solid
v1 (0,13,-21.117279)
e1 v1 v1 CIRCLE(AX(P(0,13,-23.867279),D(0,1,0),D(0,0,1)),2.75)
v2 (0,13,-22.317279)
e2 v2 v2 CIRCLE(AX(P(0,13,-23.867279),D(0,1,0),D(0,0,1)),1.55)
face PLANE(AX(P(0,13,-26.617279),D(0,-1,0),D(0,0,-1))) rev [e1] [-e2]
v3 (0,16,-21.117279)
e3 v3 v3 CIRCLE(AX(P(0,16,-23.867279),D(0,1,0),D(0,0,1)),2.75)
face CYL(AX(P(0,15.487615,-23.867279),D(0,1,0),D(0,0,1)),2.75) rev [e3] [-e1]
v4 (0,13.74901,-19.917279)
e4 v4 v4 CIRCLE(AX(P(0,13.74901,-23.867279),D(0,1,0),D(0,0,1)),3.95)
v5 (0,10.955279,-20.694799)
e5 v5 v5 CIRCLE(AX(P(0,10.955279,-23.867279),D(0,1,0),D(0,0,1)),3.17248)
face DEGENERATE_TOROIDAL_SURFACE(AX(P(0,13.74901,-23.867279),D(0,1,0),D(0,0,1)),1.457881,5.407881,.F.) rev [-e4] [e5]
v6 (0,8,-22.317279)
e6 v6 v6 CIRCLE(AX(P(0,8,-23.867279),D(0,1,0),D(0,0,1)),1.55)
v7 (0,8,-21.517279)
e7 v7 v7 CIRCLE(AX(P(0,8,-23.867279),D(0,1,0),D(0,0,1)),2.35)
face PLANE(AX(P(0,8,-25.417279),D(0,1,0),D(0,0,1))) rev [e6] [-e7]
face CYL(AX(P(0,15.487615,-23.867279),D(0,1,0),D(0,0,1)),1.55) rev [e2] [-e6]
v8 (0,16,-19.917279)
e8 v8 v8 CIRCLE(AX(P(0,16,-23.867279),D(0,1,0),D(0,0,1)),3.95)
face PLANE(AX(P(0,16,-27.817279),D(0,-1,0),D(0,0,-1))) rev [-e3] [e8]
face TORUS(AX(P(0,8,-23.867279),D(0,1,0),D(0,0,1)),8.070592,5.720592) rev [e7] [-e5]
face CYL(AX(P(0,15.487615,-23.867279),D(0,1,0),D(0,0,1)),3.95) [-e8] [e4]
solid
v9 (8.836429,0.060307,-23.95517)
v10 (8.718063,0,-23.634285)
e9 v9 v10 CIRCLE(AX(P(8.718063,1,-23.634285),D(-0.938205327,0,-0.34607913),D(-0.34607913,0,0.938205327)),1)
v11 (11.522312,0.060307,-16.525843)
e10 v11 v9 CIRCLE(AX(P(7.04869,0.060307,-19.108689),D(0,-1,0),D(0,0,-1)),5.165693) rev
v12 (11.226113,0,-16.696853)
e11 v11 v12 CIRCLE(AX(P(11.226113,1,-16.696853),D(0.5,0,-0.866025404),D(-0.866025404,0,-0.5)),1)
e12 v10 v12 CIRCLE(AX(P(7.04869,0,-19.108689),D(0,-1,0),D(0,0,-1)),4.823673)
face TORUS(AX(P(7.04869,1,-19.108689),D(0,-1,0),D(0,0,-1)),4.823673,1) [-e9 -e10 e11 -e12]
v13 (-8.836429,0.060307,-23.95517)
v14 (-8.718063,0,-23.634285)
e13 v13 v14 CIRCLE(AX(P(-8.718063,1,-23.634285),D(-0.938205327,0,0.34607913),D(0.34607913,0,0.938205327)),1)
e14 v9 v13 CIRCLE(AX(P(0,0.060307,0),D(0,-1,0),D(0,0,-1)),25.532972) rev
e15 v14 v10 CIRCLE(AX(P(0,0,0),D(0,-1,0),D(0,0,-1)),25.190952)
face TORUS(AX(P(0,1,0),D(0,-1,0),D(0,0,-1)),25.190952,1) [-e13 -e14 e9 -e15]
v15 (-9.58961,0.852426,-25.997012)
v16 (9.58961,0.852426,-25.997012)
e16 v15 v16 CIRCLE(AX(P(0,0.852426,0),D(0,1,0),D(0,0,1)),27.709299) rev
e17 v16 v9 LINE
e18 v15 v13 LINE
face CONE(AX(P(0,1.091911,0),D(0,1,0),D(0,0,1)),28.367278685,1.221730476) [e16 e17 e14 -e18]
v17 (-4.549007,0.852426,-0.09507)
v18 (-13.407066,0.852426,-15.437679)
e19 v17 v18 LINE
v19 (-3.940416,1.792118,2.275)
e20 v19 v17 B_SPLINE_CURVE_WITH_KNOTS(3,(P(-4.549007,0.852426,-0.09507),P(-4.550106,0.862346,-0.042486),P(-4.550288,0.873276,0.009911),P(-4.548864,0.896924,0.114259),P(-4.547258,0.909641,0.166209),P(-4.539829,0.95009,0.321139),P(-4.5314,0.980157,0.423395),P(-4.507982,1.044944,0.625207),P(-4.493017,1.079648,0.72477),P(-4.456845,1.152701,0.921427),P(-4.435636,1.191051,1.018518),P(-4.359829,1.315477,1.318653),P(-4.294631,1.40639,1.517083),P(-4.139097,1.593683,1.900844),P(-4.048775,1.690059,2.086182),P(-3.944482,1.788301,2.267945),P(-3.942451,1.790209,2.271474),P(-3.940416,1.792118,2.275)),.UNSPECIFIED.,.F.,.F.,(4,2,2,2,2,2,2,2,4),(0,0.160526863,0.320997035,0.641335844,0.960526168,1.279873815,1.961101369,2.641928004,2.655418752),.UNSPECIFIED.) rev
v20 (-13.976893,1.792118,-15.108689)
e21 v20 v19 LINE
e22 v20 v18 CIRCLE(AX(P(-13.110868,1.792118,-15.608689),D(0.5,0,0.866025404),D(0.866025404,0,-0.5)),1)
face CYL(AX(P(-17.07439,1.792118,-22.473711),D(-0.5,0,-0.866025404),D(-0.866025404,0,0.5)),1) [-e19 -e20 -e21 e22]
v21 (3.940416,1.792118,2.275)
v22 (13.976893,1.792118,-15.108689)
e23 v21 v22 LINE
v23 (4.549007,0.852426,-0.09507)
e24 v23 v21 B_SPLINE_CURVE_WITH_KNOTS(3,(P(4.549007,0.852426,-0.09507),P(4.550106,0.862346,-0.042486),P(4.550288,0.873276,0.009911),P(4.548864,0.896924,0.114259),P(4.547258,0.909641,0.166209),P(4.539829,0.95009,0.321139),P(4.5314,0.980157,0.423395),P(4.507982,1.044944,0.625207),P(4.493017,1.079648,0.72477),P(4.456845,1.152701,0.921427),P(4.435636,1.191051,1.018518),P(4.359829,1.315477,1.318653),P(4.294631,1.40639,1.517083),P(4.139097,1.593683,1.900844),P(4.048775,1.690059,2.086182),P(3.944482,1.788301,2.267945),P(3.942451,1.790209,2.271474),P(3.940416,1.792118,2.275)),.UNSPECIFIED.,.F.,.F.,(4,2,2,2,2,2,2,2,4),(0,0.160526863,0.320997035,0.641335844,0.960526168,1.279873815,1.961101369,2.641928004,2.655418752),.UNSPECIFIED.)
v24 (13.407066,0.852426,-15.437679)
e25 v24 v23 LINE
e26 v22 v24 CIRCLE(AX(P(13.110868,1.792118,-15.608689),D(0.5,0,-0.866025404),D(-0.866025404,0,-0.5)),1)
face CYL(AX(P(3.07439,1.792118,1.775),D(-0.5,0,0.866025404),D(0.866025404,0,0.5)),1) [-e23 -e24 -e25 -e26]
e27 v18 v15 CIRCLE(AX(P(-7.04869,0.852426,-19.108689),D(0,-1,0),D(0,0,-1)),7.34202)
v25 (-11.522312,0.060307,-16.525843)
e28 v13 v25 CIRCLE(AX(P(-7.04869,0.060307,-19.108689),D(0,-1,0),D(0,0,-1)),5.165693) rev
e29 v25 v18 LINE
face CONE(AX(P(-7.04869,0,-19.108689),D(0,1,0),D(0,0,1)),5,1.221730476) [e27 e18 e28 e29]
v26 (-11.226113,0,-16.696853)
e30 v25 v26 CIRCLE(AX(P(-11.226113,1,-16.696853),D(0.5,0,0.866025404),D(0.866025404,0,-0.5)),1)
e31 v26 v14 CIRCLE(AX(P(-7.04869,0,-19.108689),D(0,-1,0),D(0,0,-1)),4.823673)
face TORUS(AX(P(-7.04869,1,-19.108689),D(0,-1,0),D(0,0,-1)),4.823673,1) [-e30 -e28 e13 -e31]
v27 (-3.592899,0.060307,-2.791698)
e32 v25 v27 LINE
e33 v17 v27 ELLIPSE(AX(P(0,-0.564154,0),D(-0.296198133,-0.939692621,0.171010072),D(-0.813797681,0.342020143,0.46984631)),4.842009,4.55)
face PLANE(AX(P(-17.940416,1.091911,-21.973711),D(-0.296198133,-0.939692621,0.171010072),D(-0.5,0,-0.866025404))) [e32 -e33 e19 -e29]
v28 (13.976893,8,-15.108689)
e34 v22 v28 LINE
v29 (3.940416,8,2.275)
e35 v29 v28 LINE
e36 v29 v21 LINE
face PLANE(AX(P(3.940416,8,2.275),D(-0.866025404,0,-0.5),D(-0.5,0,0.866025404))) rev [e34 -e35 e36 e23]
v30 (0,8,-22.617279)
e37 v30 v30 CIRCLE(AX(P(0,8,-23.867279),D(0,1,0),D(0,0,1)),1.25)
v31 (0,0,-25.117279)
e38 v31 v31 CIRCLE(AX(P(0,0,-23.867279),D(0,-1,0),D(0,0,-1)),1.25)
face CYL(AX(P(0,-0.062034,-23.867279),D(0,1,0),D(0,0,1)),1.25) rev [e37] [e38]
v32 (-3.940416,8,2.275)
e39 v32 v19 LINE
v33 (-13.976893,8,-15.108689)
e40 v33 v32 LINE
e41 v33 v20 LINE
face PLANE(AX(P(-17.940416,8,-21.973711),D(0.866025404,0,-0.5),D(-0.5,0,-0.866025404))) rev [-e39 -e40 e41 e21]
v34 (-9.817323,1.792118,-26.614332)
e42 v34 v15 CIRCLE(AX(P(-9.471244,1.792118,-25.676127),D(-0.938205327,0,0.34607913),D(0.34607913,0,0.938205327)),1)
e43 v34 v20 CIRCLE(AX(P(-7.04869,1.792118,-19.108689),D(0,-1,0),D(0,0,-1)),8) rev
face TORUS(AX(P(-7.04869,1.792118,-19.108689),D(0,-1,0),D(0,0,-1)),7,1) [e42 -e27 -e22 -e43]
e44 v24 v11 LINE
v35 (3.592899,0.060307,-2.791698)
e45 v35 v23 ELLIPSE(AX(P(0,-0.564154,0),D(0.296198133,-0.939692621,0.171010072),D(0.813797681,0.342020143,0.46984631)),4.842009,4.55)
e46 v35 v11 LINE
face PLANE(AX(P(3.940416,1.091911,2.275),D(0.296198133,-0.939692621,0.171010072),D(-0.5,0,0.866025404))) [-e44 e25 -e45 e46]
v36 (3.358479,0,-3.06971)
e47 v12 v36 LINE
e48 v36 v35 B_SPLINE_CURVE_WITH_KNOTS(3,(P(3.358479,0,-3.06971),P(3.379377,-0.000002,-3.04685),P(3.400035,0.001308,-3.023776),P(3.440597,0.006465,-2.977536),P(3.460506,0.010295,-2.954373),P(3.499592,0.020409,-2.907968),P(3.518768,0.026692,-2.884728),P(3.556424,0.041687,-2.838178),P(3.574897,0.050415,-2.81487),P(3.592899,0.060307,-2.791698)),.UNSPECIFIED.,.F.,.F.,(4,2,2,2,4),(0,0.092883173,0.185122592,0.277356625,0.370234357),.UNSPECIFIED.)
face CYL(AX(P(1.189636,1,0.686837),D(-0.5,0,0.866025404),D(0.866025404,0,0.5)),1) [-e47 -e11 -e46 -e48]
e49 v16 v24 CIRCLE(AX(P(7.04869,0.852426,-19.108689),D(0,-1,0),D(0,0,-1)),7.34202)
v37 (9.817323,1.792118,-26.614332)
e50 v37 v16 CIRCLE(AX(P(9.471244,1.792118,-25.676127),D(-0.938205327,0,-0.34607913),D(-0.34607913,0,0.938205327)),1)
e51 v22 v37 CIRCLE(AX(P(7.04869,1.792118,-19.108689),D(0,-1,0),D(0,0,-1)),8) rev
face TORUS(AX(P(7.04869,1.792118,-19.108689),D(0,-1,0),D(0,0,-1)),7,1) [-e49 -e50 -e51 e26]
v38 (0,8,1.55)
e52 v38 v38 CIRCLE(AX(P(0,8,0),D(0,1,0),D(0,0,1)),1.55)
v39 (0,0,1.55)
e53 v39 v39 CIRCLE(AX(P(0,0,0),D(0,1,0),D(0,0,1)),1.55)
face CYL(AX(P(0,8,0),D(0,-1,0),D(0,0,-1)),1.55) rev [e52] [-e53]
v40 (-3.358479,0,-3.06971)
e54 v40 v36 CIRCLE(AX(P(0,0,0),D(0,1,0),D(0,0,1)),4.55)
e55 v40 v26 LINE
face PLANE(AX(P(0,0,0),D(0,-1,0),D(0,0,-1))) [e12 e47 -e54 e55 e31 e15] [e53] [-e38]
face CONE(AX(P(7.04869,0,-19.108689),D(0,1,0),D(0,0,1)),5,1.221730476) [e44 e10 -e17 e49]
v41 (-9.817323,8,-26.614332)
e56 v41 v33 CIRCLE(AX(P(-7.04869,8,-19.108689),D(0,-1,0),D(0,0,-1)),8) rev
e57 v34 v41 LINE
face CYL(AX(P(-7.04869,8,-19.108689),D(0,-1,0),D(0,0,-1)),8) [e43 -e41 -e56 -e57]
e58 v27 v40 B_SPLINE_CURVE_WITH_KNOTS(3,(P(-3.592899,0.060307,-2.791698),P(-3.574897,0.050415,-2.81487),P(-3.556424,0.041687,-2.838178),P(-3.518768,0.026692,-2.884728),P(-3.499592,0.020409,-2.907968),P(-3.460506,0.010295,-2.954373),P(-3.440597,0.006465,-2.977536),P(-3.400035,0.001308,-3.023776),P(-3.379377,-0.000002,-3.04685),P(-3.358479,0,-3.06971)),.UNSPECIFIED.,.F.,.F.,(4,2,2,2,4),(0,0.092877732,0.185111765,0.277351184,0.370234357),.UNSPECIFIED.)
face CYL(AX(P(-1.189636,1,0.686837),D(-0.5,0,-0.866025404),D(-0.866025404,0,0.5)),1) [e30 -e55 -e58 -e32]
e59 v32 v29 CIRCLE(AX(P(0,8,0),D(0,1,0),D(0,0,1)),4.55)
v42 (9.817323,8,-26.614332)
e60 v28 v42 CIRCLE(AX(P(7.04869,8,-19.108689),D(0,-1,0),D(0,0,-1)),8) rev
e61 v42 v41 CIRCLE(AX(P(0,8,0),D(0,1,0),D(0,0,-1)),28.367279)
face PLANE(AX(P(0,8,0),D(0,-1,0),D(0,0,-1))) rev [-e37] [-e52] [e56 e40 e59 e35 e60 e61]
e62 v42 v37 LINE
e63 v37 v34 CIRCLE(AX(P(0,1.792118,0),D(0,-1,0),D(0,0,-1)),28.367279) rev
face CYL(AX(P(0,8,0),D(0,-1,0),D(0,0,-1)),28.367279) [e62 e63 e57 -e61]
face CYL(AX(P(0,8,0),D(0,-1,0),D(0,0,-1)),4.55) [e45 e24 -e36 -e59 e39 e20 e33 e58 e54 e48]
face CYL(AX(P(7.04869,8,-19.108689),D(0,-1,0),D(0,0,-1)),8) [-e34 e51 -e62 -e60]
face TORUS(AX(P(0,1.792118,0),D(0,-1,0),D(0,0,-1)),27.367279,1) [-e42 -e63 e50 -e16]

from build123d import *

# Parameters (mm, degrees)
SKETCH1_R           = 1.55
BOSS_EXTRUDE1_DEPTH = 8
FILLET1_R           = 8
CHAMFER1_SIZE       = 1.091910703
CHAMFER1_SIZE_2     = 3
BOSS_EXTRUDE2_START = -8
SKETCH2_R           = 4.55
SKETCH2_R_2         = 1.55
BOSS_EXTRUDE2_DEPTH = 8
FILLET2_R           = 1
SKETCH3_R           = 1.25
CUT_EXTRUDE1_DEPTH  = 34.093285996


with BuildPart() as part:
    # Sketch1 → Boss-Extrude1 (new body)
    with BuildSketch(Plane(origin=(0, 0, 0), x_dir=(1, 0, 0), z_dir=(0, 1, 0))):
        with BuildLine():
            Line((-17.940415587, 21.973711306), (-3.940415587, -2.275))
            ThreePointArc((-3.940415587, -2.275), (0, -4.55), (3.940415587, -2.275))
            Line((3.940415587, -2.275), (17.940415587, 21.973711306))
            ThreePointArc((17.940415587, 21.973711306), (0, 28.367278685), (-17.940415587, 21.973711306))
        make_face()
        with Locations(Location((0, 0, 0), (0, 0, 270))):
            Circle(SKETCH1_R, mode=Mode.SUBTRACT)
    extrude(amount=BOSS_EXTRUDE1_DEPTH)

    # Fillet1
    fillet1_edges = [part.edges().sort_by_distance(p)[0] for p in [
        (17.940415587, 4, -21.973711306),
        (-17.940415587, 4, -21.973711306),
    ]]
    fillet(fillet1_edges, radius=FILLET1_R)

    # Chamfer1
    # the kernel refuses this chamfer: 3, 1.091910703 mm, written as the material it takes off along each edge
    with BuildSketch(Plane(origin=(-13.976893319, 0, -15.10868936), x_dir=(-0.08577193736400629, 0.9950833631817486, 0.04952045112602449), z_dir=(0.49999999999999806, 0, 0.8660254037844399))) as chamfer1_piece_1:
        Polygon((CHAMFER1_SIZE * 0.995083362998, -CHAMFER1_SIZE * 0.0990409022338), (-CHAMFER1_SIZE_2 * 0.099040902252, -CHAMFER1_SIZE_2 * 0.995083363182), (0, 0), align=None)
    extrude(amount=20.072955463, mode=Mode.SUBTRACT)
    with BuildSketch(Plane(origin=(0, 0, 0), x_dir=(0.3460791300418841, 0, -0.9382053270736915), z_dir=(0.9382053270736915, 0, 0.3460791300418841))) as chamfer1_piece_2:
        Polygon((28.367278685 - CHAMFER1_SIZE_2, 0), (28.367278685, CHAMFER1_SIZE), (28.367278685, 0), align=None)
    revolve(axis=Axis((0, 0, 0), (0, 1, 0)), revolution_arc=40.495367591, mode=Mode.SUBTRACT)
    with BuildSketch(Plane(origin=(7.048690089, 0, -19.10868936), x_dir=(0.86602540378444, 0, 0.4999999999999976), z_dir=(-0.4999999999999976, 0, 0.86602540378444))) as chamfer1_piece_3:
        Polygon((8 - CHAMFER1_SIZE_2, 0), (8, CHAMFER1_SIZE), (8, 0), align=None)
    revolve(axis=Axis((7.048690089, 0, -19.10868936), (0, 1, 0)), revolution_arc=99.752316204, mode=Mode.SUBTRACT)
    with BuildSketch(Plane(origin=(-7.048690089, 0, -19.10868936), x_dir=(-0.8660254037844399, 0, 0.499999999999998), z_dir=(0.499999999999998, 0, 0.8660254037844399))) as chamfer1_piece_4:
        Polygon((8 - CHAMFER1_SIZE_2, 0), (8, -CHAMFER1_SIZE), (8, 0), align=None)
    revolve(axis=Axis((-7.048690089, 0, -19.10868936), (0, -1, 0)), revolution_arc=99.752316204, mode=Mode.SUBTRACT)
    with BuildSketch(Plane(origin=(3.940415587, 0, 2.275), x_dir=(-0.8659501345095242, -0.013184058198645904, -0.4999565432638637), z_dir=(0.49999999999999806, 0, -0.8660254037844399))) as chamfer1_piece_5:
        Polygon((CHAMFER1_SIZE_2 * 0.999913086528, CHAMFER1_SIZE_2 * 0.0131840581986), (-CHAMFER1_SIZE * 0.0131840581962, CHAMFER1_SIZE * 0.999913086343), (0, 0), align=None)
    extrude(amount=20.072955463, mode=Mode.SUBTRACT)
    with BuildSketch(Plane(origin=(0, 0, 0), x_dir=(-0.8660254037844397, 0, 0.49999999999999806), z_dir=(-0.49999999999999806, 0, -0.8660254037844397))) as chamfer1_piece_6:
        Polygon((4.55 - CHAMFER1_SIZE_2, 0), (4.55, CHAMFER1_SIZE), (4.55, 0), align=None)
    revolve(axis=Axis((0, 0, 0), (0, 1, 0)), revolution_arc=120, mode=Mode.SUBTRACT)

    # Sketch2 → Boss-Extrude2 (add)
    with BuildSketch(Plane(origin=(0, 8, 0), x_dir=(1, 0, 0), z_dir=(0, 1, 0)).offset(BOSS_EXTRUDE2_START)):
        Circle(SKETCH2_R)
        with Locations(Location((0, 0, 0), (0, 0, 270))):
            Circle(SKETCH2_R_2, mode=Mode.SUBTRACT)
    extrude(amount=BOSS_EXTRUDE2_DEPTH)

    # Fillet2
    # the kernel refuses this fillet: 1 mm, written as the material it takes off along each edge
    with BuildSketch(Plane(origin=(-11.378817108, 0, -16.60868936), x_dir=(0.866025403784329, -5.361374088471519e-13, -0.50000000000019), z_dir=(0.5000000000001901, 0, 0.866025403784329))) as fillet2_piece_1_section:
        with BuildLine():
            CenterArc((FILLET2_R * 0.176326980708, FILLET2_R), FILLET2_R, 250, 20)
            Line((-FILLET2_R * 0.165693162617, FILLET2_R * 0.0603073792139), (0, 0))
            Line((0, 0), (FILLET2_R * 0.176326980708, 0))
        make_face()
    fillet2_piece_1 = extrude(amount=16.235922988, mode=Mode.PRIVATE)
    fillet2_piece_1 = fillet2_piece_1 - Plane(origin=(0, 0.006623758, 0), x_dir=(-0.8660254037844397, 0, 0.49999999999999806), z_dir=(0, -1, 0)) * Cylinder(4.55, 34, mode=Mode.PRIVATE)
    add(fillet2_piece_1, mode=Mode.SUBTRACT)
    with BuildSketch(Plane(origin=(-7.048690089, 0, -19.10868936), x_dir=(-0.8660254037843291, 0, 0.5000000000001897), z_dir=(0.5000000000001897, 0, 0.8660254037843291))) as fillet2_piece_2:
        with BuildLine():
            CenterArc((5 - FILLET2_R * 0.176326980739, -FILLET2_R), FILLET2_R, 69.999999997, 20.000000003)
            Line((5 + FILLET2_R * 0.165693162642, -FILLET2_R * 0.0603073792344), (5, 0))
            Line((5, 0), (5 - FILLET2_R * 0.176326980739, 0))
        make_face()
    revolve(axis=Axis((-7.048690089, 0, -19.10868936), (0, -1, 0)), revolution_arc=99.752316204, mode=Mode.SUBTRACT)
    with BuildSketch(Plane(origin=(0, 0, 0), x_dir=(0.34607913004188606, 0, -0.938205327073691), z_dir=(0.938205327073691, 0, 0.34607913004188606))) as fillet2_piece_3:
        with BuildLine():
            CenterArc((25.367278685 - FILLET2_R * 0.176326980739, FILLET2_R), FILLET2_R, 270, 20.000000003)
            Line((25.367278685 + FILLET2_R * 0.165693162642, FILLET2_R * 0.0603073792344), (25.367278685, 0))
            Line((25.367278685, 0), (25.367278685 - FILLET2_R * 0.176326980739, 0))
        make_face()
    revolve(axis=Axis((0, 0, 0), (0, 1, 0)), revolution_arc=40.495367591, mode=Mode.SUBTRACT)
    with BuildSketch(Plane(origin=(7.048690089, 0, -19.10868936), x_dir=(0.8660254037843291, 0, 0.5000000000001897), z_dir=(-0.5000000000001897, 0, 0.8660254037843291))) as fillet2_piece_4:
        with BuildLine():
            CenterArc((5 - FILLET2_R * 0.176326980739, FILLET2_R), FILLET2_R, 270, 20.000000003)
            Line((5 + FILLET2_R * 0.165693162642, FILLET2_R * 0.0603073792344), (5, 0))
            Line((5, 0), (5 - FILLET2_R * 0.176326980739, 0))
        make_face()
    revolve(axis=Axis((7.048690089, 0, -19.10868936), (0, 1, 0)), revolution_arc=99.752316204, mode=Mode.SUBTRACT)
    with BuildSketch(Plane(origin=(-13.976893319, 1.091910703, -15.10868936), x_dir=(0.8137976813493196, -0.34202014332551345, -0.469846310393161), z_dir=(0.5000000000001901, 0, 0.866025403784329))) as fillet2_piece_5_section:
        with BuildLine():
            CenterArc((FILLET2_R * 0.70020753821, FILLET2_R), FILLET2_R, 200, 70)
            Line((-FILLET2_R * 0.239485082576, FILLET2_R * 0.657979856674), (0, 0))
            Line((0, 0), (FILLET2_R * 0.70020753821, 0))
        make_face()
    fillet2_piece_5 = extrude(amount=21.823474309, mode=Mode.PRIVATE)
    fillet2_piece_5 = fillet2_piece_5 - Plane(origin=(0, 1.202448518, 0), x_dir=(-0.8660254037844397, 0, 0.49999999999999806), z_dir=(0, -1, 0)) * Cylinder(4.55, 47, mode=Mode.PRIVATE)
    add(fillet2_piece_5, mode=Mode.SUBTRACT)
    with BuildSketch(Plane(origin=(-7.048690089, 1.091910703, -19.10868936), x_dir=(-0.8660254037843289, 0, 0.5000000000001901), z_dir=(0.5000000000001901, 0, 0.8660254037843289))) as fillet2_piece_6:
        with BuildLine():
            CenterArc((8 - FILLET2_R, -FILLET2_R * 0.700207538166), FILLET2_R, 0, 69.999999997)
            Line((8, -FILLET2_R * 0.700207538166), (8, 0))
            Line((8, 0), (8 - FILLET2_R * 0.657979856619, FILLET2_R * 0.2394850826))
        make_face()
    revolve(axis=Axis((-7.048690089, 1.091910703, -19.10868936), (0, -1, 0)), revolution_arc=99.752316204, mode=Mode.SUBTRACT)
    with BuildSketch(Plane(origin=(0, 1.091910703, 0), x_dir=(0.34607913004188606, 0, -0.9382053270736909), z_dir=(0.9382053270736909, 0, 0.34607913004188606))) as fillet2_piece_7:
        with BuildLine():
            CenterArc((28.367278685 - FILLET2_R, FILLET2_R * 0.700207538166), FILLET2_R, 290.000000003, 69.999999997)
            Line((28.367278685, FILLET2_R * 0.700207538166), (28.367278685, 0))
            Line((28.367278685, 0), (28.367278685 - FILLET2_R * 0.657979856619, -FILLET2_R * 0.2394850826))
        make_face()
    revolve(axis=Axis((0, 1.091910703, 0), (0, 1, 0)), revolution_arc=40.495367591, mode=Mode.SUBTRACT)
    with BuildSketch(Plane(origin=(7.048690089, 1.091910703, -19.10868936), x_dir=(0.8660254037843289, 0, 0.5000000000001901), z_dir=(-0.5000000000001901, 0, 0.8660254037843289))) as fillet2_piece_8:
        with BuildLine():
            CenterArc((8 - FILLET2_R, FILLET2_R * 0.700207538166), FILLET2_R, 290.000000003, 69.999999997)
            Line((8, FILLET2_R * 0.700207538166), (8, 0))
            Line((8, 0), (8 - FILLET2_R * 0.657979856619, -FILLET2_R * 0.2394850826))
        make_face()
    revolve(axis=Axis((7.048690089, 1.091910703, -19.10868936), (0, 1, 0)), revolution_arc=99.752316204, mode=Mode.SUBTRACT)
    with BuildSketch(Plane(origin=(3.260855614, 0, -2.547967599), x_dir=(-0.8660254037843289, 0, -0.50000000000019), z_dir=(0.5000000000001901, 0, -0.866025403784329))) as fillet2_piece_9_section:
        with BuildLine():
            CenterArc((FILLET2_R * 0.176326980709, FILLET2_R), FILLET2_R, 250, 20)
            Line((-FILLET2_R * 0.165693162617, FILLET2_R * 0.0603073792142), (0, 0))
            Line((0, 0), (FILLET2_R * 0.176326980709, 0))
        make_face()
    fillet2_piece_9 = extrude(amount=16.235922988, mode=Mode.PRIVATE)
    fillet2_piece_9 = fillet2_piece_9 - Plane(origin=(0, 0.006623758, 0), x_dir=(-0.8660254037844397, 0, 0.49999999999999806), z_dir=(0, -1, 0)) * Cylinder(4.55, 34, mode=Mode.PRIVATE)
    add(fillet2_piece_9, mode=Mode.SUBTRACT)
    with BuildSketch(Plane(origin=(3.065156164, 1.091910703, 3.79099379), x_dir=(-0.813797681349209, -0.34202014332586417, -0.46984631039309716), z_dir=(0.5000000000001901, 0, -0.866025403784329))) as fillet2_piece_10_section:
        with BuildLine():
            CenterArc((FILLET2_R * 0.70020753821, FILLET2_R), FILLET2_R, 200, 70)
            Line((-FILLET2_R * 0.239485082576, FILLET2_R * 0.657979856674), (0, 0))
            Line((0, 0), (FILLET2_R * 0.70020753821, 0))
        make_face()
    fillet2_piece_10 = extrude(amount=21.823474309, mode=Mode.PRIVATE)
    fillet2_piece_10 = fillet2_piece_10 - Plane(origin=(0, 1.202094614, 0), x_dir=(-0.8660254037844397, 0, 0.49999999999999806), z_dir=(0, -1, 0)) * Cylinder(4.55, 47, mode=Mode.PRIVATE)
    add(fillet2_piece_10, mode=Mode.SUBTRACT)

    # Sketch3 → Cut-Extrude1 (cut, through all)
    with BuildSketch(Plane(origin=(0, 8, 0), x_dir=(1, 0, 0), z_dir=(0, 1, 0))):
        with Locations(Location((0, 23.867278685, 0), (0, 0, 270))):
            Circle(SKETCH3_R)
    extrude(amount=-CUT_EXTRUDE1_DEPTH, mode=Mode.SUBTRACT)


with BuildPart() as body_2:
    # Sketch4 → Revolve1 (revolve)
    with BuildSketch(Plane(origin=(0, 0, 0), x_dir=(0, 0, -1), z_dir=(1, 0, 0)), mode=Mode.PRIVATE) as revolve1_sk:
        with BuildLine():
            Line((25.417278685, 8), (26.217278685, 8))
            ThreePointArc((26.217278685, 8), (26.426733202, 9.533798037), (27.03975876, 10.955278701))
            ThreePointArc((27.03975876, 10.955278701), (27.619273815, 12.299055375), (27.817278685, 13.749009692))
            Line((27.817278685, 13.749009692), (27.817278685, 16))
            Line((27.817278685, 16), (26.617278685, 16))
            Line((26.617278685, 16), (26.617278685, 13))
            Line((26.617278685, 13), (25.417278685, 13))
            Line((25.417278685, 13), (25.417278685, 8))
        make_face()
    revolve(revolve1_sk.sketch.rotate(Axis((0, 15.487614556, -23.867278685), (0, -1, 0)), 180), axis=Axis((0, 15.487614556, -23.867278685), (0, -1, 0)))


solid = Compound([part.part, body_2.part])
